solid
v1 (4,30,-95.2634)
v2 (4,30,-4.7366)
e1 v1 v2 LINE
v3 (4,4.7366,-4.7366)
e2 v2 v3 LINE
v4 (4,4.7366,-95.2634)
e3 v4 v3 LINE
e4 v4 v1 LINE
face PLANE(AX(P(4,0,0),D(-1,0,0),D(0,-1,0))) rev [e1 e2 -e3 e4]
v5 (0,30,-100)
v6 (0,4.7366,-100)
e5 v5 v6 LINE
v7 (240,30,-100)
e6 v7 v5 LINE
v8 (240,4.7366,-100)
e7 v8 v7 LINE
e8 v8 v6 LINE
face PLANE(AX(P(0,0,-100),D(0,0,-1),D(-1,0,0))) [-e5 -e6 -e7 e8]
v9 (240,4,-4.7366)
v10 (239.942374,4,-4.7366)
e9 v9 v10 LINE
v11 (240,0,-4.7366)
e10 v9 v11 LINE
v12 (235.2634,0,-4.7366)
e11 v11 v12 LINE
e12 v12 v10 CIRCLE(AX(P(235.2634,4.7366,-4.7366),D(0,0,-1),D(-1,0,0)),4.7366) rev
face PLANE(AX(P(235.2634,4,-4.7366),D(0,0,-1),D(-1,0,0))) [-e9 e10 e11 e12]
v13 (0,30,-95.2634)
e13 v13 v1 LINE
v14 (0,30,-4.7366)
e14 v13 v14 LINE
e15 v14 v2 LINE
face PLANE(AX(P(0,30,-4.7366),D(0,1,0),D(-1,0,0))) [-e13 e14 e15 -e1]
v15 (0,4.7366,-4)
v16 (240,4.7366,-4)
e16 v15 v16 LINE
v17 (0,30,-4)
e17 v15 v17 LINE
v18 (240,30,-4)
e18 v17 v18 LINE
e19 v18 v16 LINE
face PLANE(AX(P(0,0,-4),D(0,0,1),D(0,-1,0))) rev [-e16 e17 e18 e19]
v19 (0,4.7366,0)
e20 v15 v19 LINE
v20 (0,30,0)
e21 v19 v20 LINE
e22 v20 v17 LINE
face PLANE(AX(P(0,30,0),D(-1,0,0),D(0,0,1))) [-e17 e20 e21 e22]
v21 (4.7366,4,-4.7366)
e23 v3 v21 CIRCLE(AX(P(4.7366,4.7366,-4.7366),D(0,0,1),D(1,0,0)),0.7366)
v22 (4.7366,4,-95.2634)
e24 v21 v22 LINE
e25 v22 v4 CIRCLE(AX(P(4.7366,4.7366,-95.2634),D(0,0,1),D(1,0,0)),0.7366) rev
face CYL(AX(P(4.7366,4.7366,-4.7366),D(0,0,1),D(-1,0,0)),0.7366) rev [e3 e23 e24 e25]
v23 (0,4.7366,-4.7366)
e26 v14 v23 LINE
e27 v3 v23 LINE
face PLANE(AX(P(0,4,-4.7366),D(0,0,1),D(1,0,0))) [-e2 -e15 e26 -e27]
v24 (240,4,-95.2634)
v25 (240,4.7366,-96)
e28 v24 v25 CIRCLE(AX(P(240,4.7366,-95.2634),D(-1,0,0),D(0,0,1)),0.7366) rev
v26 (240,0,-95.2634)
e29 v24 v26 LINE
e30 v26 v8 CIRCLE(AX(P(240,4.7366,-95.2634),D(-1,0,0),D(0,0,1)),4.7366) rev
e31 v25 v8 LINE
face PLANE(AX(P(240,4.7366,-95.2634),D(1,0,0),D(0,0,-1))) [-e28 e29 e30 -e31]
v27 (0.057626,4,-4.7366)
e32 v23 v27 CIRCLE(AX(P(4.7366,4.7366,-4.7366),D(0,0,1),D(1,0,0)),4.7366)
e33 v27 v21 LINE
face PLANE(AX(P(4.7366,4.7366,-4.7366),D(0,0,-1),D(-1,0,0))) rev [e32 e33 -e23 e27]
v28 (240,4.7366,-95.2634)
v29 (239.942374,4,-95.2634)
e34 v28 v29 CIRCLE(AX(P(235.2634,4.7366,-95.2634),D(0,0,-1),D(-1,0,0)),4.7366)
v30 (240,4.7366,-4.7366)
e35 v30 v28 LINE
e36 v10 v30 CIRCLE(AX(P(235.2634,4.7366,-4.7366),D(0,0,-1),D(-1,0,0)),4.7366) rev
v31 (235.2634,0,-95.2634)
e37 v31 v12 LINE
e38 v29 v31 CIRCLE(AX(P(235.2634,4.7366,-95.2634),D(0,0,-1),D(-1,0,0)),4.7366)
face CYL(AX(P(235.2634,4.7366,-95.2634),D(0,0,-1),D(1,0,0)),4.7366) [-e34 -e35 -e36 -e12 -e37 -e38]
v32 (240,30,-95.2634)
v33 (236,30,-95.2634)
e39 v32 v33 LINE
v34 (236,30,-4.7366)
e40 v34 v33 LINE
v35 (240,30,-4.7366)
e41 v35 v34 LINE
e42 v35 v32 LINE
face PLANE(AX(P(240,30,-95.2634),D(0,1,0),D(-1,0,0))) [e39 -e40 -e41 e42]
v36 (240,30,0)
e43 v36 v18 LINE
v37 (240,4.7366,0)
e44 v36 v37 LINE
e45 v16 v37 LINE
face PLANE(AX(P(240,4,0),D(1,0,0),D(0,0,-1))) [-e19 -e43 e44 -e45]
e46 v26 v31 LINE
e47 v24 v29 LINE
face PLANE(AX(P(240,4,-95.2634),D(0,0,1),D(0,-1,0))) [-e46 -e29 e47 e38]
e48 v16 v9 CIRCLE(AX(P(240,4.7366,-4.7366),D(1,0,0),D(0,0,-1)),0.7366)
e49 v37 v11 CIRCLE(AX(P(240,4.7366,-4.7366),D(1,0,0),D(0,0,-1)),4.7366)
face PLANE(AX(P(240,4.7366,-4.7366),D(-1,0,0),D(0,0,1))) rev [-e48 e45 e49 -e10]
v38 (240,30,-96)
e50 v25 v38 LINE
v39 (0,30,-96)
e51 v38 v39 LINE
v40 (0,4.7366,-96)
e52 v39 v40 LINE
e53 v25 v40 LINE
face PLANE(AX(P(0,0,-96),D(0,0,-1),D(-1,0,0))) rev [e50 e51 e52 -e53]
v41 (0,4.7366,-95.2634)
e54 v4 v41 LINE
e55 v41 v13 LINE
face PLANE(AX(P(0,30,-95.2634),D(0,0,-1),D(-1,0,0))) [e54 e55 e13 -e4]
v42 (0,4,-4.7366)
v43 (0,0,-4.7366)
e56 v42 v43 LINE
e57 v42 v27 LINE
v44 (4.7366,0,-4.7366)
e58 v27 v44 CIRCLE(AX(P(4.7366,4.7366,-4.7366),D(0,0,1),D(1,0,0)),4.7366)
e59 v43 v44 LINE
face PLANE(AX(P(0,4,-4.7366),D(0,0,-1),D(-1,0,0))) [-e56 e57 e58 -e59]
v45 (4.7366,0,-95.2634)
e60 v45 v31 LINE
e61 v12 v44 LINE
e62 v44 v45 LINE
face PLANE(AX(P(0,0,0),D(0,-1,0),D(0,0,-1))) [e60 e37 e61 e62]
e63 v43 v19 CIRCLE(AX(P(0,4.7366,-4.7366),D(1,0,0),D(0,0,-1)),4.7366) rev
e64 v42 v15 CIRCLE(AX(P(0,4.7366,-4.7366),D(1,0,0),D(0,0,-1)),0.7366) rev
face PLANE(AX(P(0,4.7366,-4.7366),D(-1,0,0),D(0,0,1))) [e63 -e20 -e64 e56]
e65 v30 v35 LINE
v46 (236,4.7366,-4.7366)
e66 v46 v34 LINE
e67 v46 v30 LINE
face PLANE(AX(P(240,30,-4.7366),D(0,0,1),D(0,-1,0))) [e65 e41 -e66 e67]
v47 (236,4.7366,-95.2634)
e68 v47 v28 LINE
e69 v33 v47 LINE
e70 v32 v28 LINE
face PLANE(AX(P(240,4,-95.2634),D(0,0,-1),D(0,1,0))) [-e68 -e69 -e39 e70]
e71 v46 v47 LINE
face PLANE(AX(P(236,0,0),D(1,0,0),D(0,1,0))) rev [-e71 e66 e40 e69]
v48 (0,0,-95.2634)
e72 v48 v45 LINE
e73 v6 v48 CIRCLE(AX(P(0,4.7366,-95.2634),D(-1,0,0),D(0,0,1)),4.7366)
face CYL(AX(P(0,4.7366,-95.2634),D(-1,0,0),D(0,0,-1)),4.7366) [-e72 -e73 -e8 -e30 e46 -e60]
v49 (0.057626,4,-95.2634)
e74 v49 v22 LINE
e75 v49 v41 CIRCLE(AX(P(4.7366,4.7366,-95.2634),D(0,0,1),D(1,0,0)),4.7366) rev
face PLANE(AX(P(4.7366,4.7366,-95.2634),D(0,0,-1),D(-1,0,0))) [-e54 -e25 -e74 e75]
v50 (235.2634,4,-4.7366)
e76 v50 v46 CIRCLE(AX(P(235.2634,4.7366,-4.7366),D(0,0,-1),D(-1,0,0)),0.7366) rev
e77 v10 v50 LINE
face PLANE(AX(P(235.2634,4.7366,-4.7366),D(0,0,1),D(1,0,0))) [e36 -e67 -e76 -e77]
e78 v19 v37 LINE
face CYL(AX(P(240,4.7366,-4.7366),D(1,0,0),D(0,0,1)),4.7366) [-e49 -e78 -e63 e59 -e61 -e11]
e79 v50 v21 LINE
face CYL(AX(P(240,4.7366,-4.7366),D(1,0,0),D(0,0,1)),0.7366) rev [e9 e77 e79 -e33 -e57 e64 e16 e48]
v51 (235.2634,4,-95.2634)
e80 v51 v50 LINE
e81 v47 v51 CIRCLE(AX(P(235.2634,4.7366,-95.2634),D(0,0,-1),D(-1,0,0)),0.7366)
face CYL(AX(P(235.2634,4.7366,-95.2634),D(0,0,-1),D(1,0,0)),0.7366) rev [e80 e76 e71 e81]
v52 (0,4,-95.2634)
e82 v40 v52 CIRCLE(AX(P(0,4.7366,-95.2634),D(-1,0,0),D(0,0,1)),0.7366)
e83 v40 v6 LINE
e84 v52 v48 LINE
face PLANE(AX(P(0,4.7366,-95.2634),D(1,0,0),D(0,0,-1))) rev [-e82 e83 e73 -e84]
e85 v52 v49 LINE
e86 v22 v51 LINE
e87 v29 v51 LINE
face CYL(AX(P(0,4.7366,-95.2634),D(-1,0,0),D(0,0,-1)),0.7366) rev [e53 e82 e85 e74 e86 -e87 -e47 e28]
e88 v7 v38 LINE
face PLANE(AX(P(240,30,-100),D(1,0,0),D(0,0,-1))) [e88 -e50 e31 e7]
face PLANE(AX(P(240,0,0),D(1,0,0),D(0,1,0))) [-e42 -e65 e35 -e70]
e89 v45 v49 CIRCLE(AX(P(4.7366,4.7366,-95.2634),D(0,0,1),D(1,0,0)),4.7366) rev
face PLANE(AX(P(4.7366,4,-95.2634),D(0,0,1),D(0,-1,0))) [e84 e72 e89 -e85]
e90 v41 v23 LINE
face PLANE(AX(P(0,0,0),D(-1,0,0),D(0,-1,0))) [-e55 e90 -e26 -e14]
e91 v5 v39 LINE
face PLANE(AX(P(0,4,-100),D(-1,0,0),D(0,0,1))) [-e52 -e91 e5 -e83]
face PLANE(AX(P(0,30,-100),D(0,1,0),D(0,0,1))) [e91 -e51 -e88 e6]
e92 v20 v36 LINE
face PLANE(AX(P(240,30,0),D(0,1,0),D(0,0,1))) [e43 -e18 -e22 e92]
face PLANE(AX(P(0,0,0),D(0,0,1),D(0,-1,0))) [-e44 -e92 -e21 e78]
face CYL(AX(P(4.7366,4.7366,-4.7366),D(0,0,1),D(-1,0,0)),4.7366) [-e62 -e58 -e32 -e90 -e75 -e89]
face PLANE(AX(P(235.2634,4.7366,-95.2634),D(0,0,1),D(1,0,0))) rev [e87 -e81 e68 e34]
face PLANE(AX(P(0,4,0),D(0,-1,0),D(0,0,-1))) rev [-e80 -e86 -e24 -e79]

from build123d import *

# Parameters (mm, degrees)
CROQUIS2_W                         = 240
CROQUIS2_H                         = 100
BRIDA_BASE1_DEPTH                  = 4
BRIDA_DE_ARISTA1_STRIP_W           = 17.4732
BRIDA_DE_ARISTA1_STRIP_H           = 4
BRIDA_DE_ARISTA1_STRIP_CUT_DEPTH   = 240
BRIDA_DE_ARISTA1_STRIP_2_W         = 17.4732
BRIDA_DE_ARISTA1_STRIP_2_H         = 4
BRIDA_DE_ARISTA1_STRIP_CUT_2_DEPTH = 240
BRIDA_DE_ARISTA1_DEPTH             = 240
BRIDA_DE_ARISTA1_BEND_DEPTH        = 240
BRIDA_DE_ARISTA2_STRIP_W           = 17.4732
BRIDA_DE_ARISTA2_STRIP_H           = 4
BRIDA_DE_ARISTA2_STRIP_CUT_DEPTH   = 90.5268
BRIDA_DE_ARISTA2_STRIP_2_W         = 17.4732
BRIDA_DE_ARISTA2_STRIP_2_H         = 4
BRIDA_DE_ARISTA2_STRIP_CUT_2_DEPTH = 90.5268
BRIDA_DE_ARISTA2_DEPTH             = 90.5268
BRIDA_DE_ARISTA2_BEND_DEPTH        = 90.5268


# Sheet-metal steps are written as plain solids
with BuildPart() as part:
    # Croquis2 → Brida base1 (new body)
    with BuildSketch(Plane(origin=(0, 0, 0), x_dir=(1, 0, 0), z_dir=(0, 1, 0))):
        with Locations((120, 50)):
            Rectangle(CROQUIS2_W, CROQUIS2_H)
    extrude(amount=BRIDA_BASE1_DEPTH)

    # Brida de arista1 strip (across the edge) → Brida de arista1 strip cut (cut)
    with BuildSketch(Plane(origin=(0, 4, 0), x_dir=(0, 0, -1), z_dir=(1, 0, 0))):
        with Locations((-4, -2)):
            Rectangle(BRIDA_DE_ARISTA1_STRIP_W, BRIDA_DE_ARISTA1_STRIP_H)
    extrude(amount=BRIDA_DE_ARISTA1_STRIP_CUT_DEPTH, mode=Mode.SUBTRACT)

    # Brida de arista1 strip 2 (across the edge) → Brida de arista1 strip cut 2 (cut)
    with BuildSketch(Plane(origin=(240, 4, -100), x_dir=(0, 0, 1), z_dir=(-1, 0, 0))):
        with Locations((-4, -2)):
            Rectangle(BRIDA_DE_ARISTA1_STRIP_2_W, BRIDA_DE_ARISTA1_STRIP_2_H)
    extrude(amount=BRIDA_DE_ARISTA1_STRIP_CUT_2_DEPTH, mode=Mode.SUBTRACT)

    # Brida de arista1 section (across the edge) → Brida de arista1 (add)
    with BuildSketch(Plane(origin=(0, 4, 0), x_dir=(0, 0, -1), z_dir=(1, 0, 0))):
        with BuildLine():
            Line((0, 0.7366), (0, 26))
            Line((0, 26), (4, 26))
            Line((4, 26), (4, 0.7366))
            ThreePointArc((4, 0.7366), (4.215745145, 0.215745145), (4.7366, 0))
            Line((4.7366, 0), (4.7366, -4))
            ThreePointArc((4.7366, -4), (1.38731802, -2.61268198), (0, 0.7366))
        make_face()
    extrude(amount=BRIDA_DE_ARISTA1_DEPTH)

    # Brida de arista1 section 2 (across the edge) → Brida de arista1 bend (add)
    with BuildSketch(Plane(origin=(240, 4, -100), x_dir=(0, 0, 1), z_dir=(-1, 0, 0))):
        with BuildLine():
            Line((0, 0.7366), (0, 26))
            Line((0, 26), (4, 26))
            Line((4, 26), (4, 0.7366))
            ThreePointArc((4, 0.7366), (4.215745145, 0.215745145), (4.7366, 0))
            Line((4.7366, 0), (4.7366, -4))
            ThreePointArc((4.7366, -4), (1.38731802, -2.61268198), (0, 0.7366))
        make_face()
    extrude(amount=BRIDA_DE_ARISTA1_BEND_DEPTH)

    # Brida de arista2 strip (across the edge) → Brida de arista2 strip cut (cut)
    with BuildSketch(Plane(origin=(240, 4, -4.7366), x_dir=(-1, 0, 0), z_dir=(0, 0, -1))):
        with Locations((-4, -2)):
            Rectangle(BRIDA_DE_ARISTA2_STRIP_W, BRIDA_DE_ARISTA2_STRIP_H)
    extrude(amount=BRIDA_DE_ARISTA2_STRIP_CUT_DEPTH, mode=Mode.SUBTRACT)

    # Brida de arista2 strip 2 (across the edge) → Brida de arista2 strip cut 2 (cut)
    with BuildSketch(Plane(origin=(0, 4, -95.2634), x_dir=(1, 0, 0), z_dir=(0, 0, 1))):
        with Locations((-4, -2)):
            Rectangle(BRIDA_DE_ARISTA2_STRIP_2_W, BRIDA_DE_ARISTA2_STRIP_2_H)
    extrude(amount=BRIDA_DE_ARISTA2_STRIP_CUT_2_DEPTH, mode=Mode.SUBTRACT)

    # Brida de arista2 section (across the edge) → Brida de arista2 (add)
    with BuildSketch(Plane(origin=(240, 4, -4.7366), x_dir=(-1, 0, 0), z_dir=(0, 0, -1))):
        with BuildLine():
            Line((0, 0.7366), (0, 26))
            Line((0, 26), (4, 26))
            Line((4, 26), (4, 0.7366))
            ThreePointArc((4, 0.7366), (4.215745145, 0.215745145), (4.7366, 0))
            Line((4.7366, 0), (4.7366, -4))
            ThreePointArc((4.7366, -4), (1.38731802, -2.61268198), (0, 0.7366))
        make_face()
    extrude(amount=BRIDA_DE_ARISTA2_DEPTH)

    # Brida de arista2 section 2 (across the edge) → Brida de arista2 bend (add)
    with BuildSketch(Plane(origin=(0, 4, -95.2634), x_dir=(1, 0, 0), z_dir=(0, 0, 1))):
        with BuildLine():
            Line((0, 0.7366), (0, 26))
            Line((0, 26), (4, 26))
            Line((4, 26), (4, 0.7366))
            ThreePointArc((4, 0.7366), (4.215745145, 0.215745145), (4.7366, 0))
            Line((4.7366, 0), (4.7366, -4))
            ThreePointArc((4.7366, -4), (1.38731802, -2.61268198), (0, 0.7366))
        make_face()
    extrude(amount=BRIDA_DE_ARISTA2_BEND_DEPTH)


solid = part.part
